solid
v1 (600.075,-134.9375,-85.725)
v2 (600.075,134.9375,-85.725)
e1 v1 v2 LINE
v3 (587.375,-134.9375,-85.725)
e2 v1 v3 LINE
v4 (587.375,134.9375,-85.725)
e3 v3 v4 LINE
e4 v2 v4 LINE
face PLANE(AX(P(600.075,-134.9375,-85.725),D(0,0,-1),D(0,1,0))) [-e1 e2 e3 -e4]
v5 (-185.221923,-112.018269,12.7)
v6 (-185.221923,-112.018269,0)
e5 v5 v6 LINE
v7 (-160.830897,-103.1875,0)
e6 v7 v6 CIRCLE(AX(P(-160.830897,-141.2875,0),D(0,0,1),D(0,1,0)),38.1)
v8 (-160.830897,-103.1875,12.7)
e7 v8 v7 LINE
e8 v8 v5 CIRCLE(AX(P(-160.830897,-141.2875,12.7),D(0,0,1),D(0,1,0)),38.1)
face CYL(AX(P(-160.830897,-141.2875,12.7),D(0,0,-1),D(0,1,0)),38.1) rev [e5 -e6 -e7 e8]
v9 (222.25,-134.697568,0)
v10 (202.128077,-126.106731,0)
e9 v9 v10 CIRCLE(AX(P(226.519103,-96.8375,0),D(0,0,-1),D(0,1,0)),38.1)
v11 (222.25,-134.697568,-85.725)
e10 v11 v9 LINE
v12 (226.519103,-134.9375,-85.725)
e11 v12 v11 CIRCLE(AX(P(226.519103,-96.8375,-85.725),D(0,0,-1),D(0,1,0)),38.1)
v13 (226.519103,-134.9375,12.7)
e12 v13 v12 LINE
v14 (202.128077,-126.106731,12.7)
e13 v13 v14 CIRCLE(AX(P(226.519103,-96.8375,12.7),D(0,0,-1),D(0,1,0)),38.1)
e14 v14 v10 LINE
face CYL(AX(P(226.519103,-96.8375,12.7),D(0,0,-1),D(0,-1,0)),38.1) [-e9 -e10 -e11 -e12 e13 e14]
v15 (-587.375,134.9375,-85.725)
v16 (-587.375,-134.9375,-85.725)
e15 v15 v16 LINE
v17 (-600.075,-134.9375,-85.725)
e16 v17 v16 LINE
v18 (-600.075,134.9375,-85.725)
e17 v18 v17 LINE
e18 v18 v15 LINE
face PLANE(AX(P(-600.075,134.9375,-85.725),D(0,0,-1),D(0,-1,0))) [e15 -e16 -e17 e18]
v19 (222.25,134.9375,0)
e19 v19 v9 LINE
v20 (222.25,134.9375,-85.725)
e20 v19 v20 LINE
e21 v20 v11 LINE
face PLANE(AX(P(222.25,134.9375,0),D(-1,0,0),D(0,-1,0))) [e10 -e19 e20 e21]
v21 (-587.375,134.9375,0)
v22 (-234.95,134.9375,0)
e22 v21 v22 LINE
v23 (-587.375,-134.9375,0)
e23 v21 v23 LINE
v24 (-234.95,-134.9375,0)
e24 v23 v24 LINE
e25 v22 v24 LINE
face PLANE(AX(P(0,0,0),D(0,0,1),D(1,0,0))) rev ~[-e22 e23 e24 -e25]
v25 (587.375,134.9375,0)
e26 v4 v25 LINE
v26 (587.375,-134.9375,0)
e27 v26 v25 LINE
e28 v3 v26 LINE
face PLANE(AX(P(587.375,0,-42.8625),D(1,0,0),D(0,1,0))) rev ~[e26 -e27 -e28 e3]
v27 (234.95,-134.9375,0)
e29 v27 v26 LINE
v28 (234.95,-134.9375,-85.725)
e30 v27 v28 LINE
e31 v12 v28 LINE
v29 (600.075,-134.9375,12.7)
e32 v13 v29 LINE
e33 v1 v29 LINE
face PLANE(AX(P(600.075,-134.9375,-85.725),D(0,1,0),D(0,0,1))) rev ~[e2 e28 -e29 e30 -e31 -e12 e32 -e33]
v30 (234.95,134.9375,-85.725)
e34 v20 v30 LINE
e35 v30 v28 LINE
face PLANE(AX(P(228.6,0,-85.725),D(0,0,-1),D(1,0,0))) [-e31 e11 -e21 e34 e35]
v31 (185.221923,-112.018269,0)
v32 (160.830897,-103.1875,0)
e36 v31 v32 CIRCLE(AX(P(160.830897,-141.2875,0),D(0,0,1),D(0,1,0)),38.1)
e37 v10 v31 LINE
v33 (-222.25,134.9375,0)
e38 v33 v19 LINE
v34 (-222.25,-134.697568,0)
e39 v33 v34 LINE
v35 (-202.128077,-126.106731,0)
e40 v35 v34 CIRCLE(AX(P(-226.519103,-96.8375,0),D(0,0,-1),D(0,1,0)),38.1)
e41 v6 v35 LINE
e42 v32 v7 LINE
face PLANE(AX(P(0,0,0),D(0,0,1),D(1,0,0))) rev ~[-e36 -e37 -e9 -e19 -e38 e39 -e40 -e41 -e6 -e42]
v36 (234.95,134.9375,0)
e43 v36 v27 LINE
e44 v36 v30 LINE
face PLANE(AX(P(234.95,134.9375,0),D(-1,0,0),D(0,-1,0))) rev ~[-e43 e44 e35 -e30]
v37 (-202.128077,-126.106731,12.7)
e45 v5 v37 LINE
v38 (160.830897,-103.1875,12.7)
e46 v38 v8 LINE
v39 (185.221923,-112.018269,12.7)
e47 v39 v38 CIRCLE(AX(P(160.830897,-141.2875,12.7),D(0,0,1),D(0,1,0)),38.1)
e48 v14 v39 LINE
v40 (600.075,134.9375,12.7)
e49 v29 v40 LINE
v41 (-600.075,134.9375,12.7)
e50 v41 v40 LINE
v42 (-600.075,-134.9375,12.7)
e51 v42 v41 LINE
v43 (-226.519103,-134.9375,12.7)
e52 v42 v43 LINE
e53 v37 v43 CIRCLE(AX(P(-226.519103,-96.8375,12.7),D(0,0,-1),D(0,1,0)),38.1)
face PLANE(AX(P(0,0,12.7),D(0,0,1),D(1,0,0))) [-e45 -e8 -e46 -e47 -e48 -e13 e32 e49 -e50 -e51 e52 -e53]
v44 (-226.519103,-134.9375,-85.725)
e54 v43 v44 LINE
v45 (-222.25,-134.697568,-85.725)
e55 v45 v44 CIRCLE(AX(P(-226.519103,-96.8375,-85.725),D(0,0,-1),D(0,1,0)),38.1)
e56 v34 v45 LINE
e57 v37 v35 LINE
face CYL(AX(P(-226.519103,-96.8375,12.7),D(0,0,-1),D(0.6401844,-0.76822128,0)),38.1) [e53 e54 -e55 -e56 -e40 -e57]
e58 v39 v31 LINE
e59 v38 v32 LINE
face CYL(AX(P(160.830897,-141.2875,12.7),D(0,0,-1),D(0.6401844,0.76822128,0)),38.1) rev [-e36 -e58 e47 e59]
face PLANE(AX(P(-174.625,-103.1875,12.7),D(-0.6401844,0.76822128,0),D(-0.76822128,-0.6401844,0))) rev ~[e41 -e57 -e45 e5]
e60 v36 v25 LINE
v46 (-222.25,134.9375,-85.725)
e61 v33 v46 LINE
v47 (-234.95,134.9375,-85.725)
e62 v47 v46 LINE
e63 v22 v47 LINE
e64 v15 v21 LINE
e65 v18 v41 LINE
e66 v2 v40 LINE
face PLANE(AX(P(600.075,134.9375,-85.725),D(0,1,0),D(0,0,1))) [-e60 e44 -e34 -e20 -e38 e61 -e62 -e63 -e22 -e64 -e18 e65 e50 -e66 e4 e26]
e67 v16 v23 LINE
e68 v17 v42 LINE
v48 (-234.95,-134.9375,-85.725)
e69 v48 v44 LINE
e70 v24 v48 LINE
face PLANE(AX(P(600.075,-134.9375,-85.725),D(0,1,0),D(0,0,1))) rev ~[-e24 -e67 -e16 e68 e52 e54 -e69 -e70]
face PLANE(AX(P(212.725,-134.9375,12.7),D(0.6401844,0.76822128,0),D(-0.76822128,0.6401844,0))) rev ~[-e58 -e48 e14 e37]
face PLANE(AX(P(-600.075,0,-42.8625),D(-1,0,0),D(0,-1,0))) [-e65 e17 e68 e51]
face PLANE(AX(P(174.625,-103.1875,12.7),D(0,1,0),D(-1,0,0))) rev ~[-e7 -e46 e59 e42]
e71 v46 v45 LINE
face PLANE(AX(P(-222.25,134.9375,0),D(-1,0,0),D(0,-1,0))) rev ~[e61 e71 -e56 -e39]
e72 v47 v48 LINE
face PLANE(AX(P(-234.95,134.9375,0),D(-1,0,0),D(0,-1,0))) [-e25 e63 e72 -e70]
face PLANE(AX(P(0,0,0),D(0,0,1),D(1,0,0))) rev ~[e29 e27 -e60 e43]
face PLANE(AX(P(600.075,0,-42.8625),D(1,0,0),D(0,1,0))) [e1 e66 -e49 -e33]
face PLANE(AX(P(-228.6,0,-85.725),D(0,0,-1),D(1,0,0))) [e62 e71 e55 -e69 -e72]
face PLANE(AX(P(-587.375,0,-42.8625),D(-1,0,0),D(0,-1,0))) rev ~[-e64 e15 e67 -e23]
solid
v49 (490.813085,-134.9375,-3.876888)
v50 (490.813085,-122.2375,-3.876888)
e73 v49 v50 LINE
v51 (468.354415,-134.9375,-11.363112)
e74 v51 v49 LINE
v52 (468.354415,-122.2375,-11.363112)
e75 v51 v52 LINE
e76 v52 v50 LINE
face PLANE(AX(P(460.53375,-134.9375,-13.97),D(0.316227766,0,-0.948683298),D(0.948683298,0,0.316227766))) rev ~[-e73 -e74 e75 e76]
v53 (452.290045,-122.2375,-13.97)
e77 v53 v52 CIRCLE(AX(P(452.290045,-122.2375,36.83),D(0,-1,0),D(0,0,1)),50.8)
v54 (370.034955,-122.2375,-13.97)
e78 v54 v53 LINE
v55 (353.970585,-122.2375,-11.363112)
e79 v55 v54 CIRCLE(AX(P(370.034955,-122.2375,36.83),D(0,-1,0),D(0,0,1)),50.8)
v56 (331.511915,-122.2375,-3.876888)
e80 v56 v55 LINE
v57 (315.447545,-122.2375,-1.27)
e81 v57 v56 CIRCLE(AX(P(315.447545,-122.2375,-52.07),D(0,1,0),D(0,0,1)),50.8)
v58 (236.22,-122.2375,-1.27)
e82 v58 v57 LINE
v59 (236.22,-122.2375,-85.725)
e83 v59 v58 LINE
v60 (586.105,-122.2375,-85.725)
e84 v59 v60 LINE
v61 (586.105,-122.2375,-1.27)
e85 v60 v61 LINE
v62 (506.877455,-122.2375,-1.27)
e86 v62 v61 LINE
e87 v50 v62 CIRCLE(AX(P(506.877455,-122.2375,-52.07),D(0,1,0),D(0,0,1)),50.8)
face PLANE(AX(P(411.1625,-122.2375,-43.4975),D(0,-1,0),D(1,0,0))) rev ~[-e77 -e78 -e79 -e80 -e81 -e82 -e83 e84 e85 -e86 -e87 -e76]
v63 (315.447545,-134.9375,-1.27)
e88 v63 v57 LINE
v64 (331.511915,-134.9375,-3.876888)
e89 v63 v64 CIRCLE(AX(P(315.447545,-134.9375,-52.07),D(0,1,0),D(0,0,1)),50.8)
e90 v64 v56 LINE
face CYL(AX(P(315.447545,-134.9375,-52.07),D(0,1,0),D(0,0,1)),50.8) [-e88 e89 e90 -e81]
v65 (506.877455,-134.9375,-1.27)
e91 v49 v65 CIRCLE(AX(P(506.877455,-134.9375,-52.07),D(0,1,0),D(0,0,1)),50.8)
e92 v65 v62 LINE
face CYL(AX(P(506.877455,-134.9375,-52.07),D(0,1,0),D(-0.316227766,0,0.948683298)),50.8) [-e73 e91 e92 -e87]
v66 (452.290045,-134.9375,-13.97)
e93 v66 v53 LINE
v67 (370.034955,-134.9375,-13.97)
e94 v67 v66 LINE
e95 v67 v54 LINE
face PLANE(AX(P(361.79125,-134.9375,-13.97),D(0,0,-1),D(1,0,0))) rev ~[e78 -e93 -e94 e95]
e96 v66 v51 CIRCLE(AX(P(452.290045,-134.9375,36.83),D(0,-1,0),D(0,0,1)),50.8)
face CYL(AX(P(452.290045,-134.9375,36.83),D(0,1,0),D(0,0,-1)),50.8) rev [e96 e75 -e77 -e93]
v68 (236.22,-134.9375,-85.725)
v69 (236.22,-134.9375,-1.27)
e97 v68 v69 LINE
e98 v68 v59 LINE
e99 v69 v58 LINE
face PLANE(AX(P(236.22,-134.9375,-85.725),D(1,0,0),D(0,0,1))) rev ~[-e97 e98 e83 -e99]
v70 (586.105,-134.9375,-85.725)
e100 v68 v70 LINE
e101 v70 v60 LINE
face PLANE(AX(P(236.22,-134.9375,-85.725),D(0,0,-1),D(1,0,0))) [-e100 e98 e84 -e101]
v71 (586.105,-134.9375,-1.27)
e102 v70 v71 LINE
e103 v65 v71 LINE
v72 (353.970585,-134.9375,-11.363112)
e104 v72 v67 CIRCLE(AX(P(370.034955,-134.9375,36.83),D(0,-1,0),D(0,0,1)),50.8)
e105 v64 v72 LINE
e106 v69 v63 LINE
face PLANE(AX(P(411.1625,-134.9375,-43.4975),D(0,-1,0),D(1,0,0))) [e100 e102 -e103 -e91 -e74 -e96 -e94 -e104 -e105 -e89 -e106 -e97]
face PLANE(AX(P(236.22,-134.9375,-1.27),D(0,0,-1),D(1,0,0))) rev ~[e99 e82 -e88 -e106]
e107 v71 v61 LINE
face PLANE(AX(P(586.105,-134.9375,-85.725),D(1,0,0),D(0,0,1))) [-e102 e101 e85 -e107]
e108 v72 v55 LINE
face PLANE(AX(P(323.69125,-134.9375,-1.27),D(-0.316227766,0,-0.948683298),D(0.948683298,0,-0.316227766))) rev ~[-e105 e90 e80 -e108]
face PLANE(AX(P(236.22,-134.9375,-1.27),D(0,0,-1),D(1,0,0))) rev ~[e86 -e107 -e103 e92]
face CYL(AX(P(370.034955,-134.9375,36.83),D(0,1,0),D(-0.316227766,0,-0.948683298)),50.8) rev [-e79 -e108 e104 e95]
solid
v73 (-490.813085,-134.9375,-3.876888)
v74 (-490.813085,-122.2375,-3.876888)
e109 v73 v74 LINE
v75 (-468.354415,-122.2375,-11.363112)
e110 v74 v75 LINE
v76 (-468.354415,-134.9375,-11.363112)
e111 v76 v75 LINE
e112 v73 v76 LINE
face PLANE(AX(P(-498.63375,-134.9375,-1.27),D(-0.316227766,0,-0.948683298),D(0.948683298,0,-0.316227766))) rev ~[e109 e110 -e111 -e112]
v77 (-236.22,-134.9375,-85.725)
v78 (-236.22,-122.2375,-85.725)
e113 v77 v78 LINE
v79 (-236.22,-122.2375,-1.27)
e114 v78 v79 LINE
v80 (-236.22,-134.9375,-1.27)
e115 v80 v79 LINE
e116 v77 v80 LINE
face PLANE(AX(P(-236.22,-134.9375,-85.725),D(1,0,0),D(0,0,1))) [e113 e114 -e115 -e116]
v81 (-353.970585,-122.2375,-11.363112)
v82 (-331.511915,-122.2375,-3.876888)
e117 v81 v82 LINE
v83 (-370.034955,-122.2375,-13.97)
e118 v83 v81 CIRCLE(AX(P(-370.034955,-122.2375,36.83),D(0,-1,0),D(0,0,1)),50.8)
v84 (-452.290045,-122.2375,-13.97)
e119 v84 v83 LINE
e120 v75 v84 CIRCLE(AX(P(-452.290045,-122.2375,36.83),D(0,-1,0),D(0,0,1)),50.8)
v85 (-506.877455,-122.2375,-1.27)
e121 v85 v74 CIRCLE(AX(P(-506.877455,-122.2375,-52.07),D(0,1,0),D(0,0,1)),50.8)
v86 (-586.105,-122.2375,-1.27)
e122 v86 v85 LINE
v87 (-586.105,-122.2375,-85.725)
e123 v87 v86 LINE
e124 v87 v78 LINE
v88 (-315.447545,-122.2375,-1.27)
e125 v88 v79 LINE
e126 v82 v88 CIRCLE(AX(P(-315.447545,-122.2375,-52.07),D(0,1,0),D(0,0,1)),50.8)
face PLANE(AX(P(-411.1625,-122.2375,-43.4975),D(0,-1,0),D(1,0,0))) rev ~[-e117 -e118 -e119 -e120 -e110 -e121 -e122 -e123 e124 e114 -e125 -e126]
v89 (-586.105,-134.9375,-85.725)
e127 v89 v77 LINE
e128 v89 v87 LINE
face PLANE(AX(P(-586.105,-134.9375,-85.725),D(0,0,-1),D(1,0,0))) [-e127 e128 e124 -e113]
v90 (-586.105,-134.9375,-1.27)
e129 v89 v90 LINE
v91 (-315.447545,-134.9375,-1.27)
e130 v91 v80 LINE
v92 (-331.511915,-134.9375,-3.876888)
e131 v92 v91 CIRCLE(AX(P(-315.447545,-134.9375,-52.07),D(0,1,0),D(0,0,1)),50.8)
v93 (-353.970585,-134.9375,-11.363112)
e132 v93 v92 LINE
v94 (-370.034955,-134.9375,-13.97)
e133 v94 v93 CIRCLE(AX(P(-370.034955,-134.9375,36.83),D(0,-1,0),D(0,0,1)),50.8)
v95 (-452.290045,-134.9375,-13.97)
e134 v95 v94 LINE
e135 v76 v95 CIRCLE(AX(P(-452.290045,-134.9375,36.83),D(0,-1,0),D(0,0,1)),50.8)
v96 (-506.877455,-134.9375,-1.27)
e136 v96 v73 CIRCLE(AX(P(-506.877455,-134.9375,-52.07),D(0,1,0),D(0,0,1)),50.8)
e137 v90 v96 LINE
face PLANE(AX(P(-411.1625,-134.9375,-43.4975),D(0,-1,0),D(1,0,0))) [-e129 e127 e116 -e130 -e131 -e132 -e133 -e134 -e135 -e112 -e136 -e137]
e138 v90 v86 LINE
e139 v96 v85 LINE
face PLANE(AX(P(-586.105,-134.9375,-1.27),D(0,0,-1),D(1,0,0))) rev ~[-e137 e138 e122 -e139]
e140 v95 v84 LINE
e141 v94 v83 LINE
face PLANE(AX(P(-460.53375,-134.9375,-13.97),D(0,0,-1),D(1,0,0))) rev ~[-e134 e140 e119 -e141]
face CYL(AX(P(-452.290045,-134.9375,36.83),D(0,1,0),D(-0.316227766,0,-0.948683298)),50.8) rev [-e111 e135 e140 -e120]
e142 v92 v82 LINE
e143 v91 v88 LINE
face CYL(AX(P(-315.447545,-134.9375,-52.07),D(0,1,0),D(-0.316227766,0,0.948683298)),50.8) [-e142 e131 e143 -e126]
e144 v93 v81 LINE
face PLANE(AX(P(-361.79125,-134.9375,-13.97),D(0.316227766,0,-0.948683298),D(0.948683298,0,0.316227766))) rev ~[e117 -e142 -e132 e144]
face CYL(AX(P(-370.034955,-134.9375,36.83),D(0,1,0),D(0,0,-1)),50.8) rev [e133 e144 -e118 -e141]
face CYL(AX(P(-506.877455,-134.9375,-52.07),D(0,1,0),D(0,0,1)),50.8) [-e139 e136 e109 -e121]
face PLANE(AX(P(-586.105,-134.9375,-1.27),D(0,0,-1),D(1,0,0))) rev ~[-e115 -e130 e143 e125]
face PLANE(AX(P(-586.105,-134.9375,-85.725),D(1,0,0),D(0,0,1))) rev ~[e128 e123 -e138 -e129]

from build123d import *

# Parameters (mm, degrees)
F0_W      = 1200.15
F0_H      = 269.875
F1_DEPTH  = 12.7
F2_W      = 269.875
F2_H      = 85.725
F3_DEPTH  = 12.7
F4_W      = 269.875
F4_H      = 85.725
F5_DEPTH  = 12.7
F6_W      = 12.7
F6_H      = 269.875
F7_DEPTH  = 85.725
F9_DEPTH  = 12.7
F10_R     = 38.1
F11_W     = 349.885
F11_H     = 84.455
F12_DEPTH = 12.7
F13_W     = 349.885
F13_H     = 84.455
F14_DEPTH = 12.7
F16_DEPTH = 12.7
F17_R     = 50.8
F19_DEPTH = 12.7
F20_R     = 50.8


with BuildPart() as f1:
    # F0 (on Top) → F1 (new body)
    with BuildSketch(Plane.XY):
        Rectangle(F0_W, F0_H)
    extrude(amount=F1_DEPTH)

    # F2 (on face) → F3 (join)
    with BuildSketch(Plane(origin=(-600.075, 0, 0), x_dir=(0, -1, 0), z_dir=(-1, 0, 0))):
        with Locations((0, -42.8625)):
            Rectangle(F2_W, F2_H)
    extrude(amount=-F3_DEPTH)

    # F4 (on face) → F5 (join)
    with BuildSketch(Plane.YZ.offset(600.075)):
        with Locations((0, -42.8625)):
            Rectangle(F4_W, F4_H)
    extrude(amount=-F5_DEPTH)

    # F6 (on face) → F7 (join)
    with BuildSketch(Plane(origin=(0, 0, 0), x_dir=(1, 0, 0), z_dir=(0, 0, -1))):
        with Locations((228.6, 0)):
            Rectangle(F6_W, F6_H)
        with Locations((-228.6, 0)):
            Rectangle(F6_W, F6_H)
    extrude(amount=F7_DEPTH)

    # F8 (on face) → F9 (cut)
    with BuildSketch(Plane.XY.offset(12.7)):
        Polygon((174.625, -103.1875), (-174.625, -103.1875), (-212.725, -134.9375), (212.725, -134.9375), align=None)
    extrude(amount=-F9_DEPTH, mode=Mode.SUBTRACT)

    # F10
    f10_edges = [f1.edges().sort_by_distance(p)[0] for p in [
        (-174.625, -103.1875, 6.35),
        (-212.725, -134.9375, 6.35),
        (174.625, -103.1875, 6.35),
        (212.725, -134.9375, 6.35),
    ]]
    fillet(f10_edges, radius=F10_R)


with BuildPart() as f12:
    # F11 (on face) → F12 (new body)
    with BuildSketch(Plane.XZ.offset(134.9375)):
        with Locations((-411.1625, -43.4975)):
            Rectangle(F11_W, F11_H)
    extrude(amount=-F12_DEPTH)

    # F15 (on face) → F16 (cut)
    with BuildSketch(Plane.XZ.offset(134.9375)):
        Polygon((-323.69125, -1.27), (-498.63375, -1.27), (-460.53375, -13.97), (-361.79125, -13.97), align=None)
    extrude(amount=-F16_DEPTH, mode=Mode.SUBTRACT)

    # F17
    f17_edges = [f12.edges().sort_by_distance(p)[0] for p in [
        (-498.63375, -128.5875, -1.27),
        (-460.53375, -128.5875, -13.97),
        (-361.79125, -128.5875, -13.97),
        (-323.69125, -128.5875, -1.27),
    ]]
    fillet(f17_edges, radius=F17_R)


with BuildPart() as f14:
    # F13 (on face) → F14 (new body)
    with BuildSketch(Plane.XZ.offset(134.9375)):
        with Locations((411.1625, -43.4975)):
            Rectangle(F13_W, F13_H)
    extrude(amount=-F14_DEPTH)

    # F18 (on face) → F19 (cut)
    with BuildSketch(Plane.XZ.offset(134.9375)):
        Polygon((498.63375, -1.27), (323.69125, -1.27), (361.79125, -13.97), (460.53375, -13.97), align=None)
    extrude(amount=-F19_DEPTH, mode=Mode.SUBTRACT)

    # F20
    f20_edges = [f14.edges().sort_by_distance(p)[0] for p in [
        (323.69125, -128.5875, -1.27),
        (361.79125, -128.5875, -13.97),
        (460.53375, -128.5875, -13.97),
        (498.63375, -128.5875, -1.27),
    ]]
    fillet(f20_edges, radius=F20_R)


solid = Compound([f1.part, f12.part, f14.part])
